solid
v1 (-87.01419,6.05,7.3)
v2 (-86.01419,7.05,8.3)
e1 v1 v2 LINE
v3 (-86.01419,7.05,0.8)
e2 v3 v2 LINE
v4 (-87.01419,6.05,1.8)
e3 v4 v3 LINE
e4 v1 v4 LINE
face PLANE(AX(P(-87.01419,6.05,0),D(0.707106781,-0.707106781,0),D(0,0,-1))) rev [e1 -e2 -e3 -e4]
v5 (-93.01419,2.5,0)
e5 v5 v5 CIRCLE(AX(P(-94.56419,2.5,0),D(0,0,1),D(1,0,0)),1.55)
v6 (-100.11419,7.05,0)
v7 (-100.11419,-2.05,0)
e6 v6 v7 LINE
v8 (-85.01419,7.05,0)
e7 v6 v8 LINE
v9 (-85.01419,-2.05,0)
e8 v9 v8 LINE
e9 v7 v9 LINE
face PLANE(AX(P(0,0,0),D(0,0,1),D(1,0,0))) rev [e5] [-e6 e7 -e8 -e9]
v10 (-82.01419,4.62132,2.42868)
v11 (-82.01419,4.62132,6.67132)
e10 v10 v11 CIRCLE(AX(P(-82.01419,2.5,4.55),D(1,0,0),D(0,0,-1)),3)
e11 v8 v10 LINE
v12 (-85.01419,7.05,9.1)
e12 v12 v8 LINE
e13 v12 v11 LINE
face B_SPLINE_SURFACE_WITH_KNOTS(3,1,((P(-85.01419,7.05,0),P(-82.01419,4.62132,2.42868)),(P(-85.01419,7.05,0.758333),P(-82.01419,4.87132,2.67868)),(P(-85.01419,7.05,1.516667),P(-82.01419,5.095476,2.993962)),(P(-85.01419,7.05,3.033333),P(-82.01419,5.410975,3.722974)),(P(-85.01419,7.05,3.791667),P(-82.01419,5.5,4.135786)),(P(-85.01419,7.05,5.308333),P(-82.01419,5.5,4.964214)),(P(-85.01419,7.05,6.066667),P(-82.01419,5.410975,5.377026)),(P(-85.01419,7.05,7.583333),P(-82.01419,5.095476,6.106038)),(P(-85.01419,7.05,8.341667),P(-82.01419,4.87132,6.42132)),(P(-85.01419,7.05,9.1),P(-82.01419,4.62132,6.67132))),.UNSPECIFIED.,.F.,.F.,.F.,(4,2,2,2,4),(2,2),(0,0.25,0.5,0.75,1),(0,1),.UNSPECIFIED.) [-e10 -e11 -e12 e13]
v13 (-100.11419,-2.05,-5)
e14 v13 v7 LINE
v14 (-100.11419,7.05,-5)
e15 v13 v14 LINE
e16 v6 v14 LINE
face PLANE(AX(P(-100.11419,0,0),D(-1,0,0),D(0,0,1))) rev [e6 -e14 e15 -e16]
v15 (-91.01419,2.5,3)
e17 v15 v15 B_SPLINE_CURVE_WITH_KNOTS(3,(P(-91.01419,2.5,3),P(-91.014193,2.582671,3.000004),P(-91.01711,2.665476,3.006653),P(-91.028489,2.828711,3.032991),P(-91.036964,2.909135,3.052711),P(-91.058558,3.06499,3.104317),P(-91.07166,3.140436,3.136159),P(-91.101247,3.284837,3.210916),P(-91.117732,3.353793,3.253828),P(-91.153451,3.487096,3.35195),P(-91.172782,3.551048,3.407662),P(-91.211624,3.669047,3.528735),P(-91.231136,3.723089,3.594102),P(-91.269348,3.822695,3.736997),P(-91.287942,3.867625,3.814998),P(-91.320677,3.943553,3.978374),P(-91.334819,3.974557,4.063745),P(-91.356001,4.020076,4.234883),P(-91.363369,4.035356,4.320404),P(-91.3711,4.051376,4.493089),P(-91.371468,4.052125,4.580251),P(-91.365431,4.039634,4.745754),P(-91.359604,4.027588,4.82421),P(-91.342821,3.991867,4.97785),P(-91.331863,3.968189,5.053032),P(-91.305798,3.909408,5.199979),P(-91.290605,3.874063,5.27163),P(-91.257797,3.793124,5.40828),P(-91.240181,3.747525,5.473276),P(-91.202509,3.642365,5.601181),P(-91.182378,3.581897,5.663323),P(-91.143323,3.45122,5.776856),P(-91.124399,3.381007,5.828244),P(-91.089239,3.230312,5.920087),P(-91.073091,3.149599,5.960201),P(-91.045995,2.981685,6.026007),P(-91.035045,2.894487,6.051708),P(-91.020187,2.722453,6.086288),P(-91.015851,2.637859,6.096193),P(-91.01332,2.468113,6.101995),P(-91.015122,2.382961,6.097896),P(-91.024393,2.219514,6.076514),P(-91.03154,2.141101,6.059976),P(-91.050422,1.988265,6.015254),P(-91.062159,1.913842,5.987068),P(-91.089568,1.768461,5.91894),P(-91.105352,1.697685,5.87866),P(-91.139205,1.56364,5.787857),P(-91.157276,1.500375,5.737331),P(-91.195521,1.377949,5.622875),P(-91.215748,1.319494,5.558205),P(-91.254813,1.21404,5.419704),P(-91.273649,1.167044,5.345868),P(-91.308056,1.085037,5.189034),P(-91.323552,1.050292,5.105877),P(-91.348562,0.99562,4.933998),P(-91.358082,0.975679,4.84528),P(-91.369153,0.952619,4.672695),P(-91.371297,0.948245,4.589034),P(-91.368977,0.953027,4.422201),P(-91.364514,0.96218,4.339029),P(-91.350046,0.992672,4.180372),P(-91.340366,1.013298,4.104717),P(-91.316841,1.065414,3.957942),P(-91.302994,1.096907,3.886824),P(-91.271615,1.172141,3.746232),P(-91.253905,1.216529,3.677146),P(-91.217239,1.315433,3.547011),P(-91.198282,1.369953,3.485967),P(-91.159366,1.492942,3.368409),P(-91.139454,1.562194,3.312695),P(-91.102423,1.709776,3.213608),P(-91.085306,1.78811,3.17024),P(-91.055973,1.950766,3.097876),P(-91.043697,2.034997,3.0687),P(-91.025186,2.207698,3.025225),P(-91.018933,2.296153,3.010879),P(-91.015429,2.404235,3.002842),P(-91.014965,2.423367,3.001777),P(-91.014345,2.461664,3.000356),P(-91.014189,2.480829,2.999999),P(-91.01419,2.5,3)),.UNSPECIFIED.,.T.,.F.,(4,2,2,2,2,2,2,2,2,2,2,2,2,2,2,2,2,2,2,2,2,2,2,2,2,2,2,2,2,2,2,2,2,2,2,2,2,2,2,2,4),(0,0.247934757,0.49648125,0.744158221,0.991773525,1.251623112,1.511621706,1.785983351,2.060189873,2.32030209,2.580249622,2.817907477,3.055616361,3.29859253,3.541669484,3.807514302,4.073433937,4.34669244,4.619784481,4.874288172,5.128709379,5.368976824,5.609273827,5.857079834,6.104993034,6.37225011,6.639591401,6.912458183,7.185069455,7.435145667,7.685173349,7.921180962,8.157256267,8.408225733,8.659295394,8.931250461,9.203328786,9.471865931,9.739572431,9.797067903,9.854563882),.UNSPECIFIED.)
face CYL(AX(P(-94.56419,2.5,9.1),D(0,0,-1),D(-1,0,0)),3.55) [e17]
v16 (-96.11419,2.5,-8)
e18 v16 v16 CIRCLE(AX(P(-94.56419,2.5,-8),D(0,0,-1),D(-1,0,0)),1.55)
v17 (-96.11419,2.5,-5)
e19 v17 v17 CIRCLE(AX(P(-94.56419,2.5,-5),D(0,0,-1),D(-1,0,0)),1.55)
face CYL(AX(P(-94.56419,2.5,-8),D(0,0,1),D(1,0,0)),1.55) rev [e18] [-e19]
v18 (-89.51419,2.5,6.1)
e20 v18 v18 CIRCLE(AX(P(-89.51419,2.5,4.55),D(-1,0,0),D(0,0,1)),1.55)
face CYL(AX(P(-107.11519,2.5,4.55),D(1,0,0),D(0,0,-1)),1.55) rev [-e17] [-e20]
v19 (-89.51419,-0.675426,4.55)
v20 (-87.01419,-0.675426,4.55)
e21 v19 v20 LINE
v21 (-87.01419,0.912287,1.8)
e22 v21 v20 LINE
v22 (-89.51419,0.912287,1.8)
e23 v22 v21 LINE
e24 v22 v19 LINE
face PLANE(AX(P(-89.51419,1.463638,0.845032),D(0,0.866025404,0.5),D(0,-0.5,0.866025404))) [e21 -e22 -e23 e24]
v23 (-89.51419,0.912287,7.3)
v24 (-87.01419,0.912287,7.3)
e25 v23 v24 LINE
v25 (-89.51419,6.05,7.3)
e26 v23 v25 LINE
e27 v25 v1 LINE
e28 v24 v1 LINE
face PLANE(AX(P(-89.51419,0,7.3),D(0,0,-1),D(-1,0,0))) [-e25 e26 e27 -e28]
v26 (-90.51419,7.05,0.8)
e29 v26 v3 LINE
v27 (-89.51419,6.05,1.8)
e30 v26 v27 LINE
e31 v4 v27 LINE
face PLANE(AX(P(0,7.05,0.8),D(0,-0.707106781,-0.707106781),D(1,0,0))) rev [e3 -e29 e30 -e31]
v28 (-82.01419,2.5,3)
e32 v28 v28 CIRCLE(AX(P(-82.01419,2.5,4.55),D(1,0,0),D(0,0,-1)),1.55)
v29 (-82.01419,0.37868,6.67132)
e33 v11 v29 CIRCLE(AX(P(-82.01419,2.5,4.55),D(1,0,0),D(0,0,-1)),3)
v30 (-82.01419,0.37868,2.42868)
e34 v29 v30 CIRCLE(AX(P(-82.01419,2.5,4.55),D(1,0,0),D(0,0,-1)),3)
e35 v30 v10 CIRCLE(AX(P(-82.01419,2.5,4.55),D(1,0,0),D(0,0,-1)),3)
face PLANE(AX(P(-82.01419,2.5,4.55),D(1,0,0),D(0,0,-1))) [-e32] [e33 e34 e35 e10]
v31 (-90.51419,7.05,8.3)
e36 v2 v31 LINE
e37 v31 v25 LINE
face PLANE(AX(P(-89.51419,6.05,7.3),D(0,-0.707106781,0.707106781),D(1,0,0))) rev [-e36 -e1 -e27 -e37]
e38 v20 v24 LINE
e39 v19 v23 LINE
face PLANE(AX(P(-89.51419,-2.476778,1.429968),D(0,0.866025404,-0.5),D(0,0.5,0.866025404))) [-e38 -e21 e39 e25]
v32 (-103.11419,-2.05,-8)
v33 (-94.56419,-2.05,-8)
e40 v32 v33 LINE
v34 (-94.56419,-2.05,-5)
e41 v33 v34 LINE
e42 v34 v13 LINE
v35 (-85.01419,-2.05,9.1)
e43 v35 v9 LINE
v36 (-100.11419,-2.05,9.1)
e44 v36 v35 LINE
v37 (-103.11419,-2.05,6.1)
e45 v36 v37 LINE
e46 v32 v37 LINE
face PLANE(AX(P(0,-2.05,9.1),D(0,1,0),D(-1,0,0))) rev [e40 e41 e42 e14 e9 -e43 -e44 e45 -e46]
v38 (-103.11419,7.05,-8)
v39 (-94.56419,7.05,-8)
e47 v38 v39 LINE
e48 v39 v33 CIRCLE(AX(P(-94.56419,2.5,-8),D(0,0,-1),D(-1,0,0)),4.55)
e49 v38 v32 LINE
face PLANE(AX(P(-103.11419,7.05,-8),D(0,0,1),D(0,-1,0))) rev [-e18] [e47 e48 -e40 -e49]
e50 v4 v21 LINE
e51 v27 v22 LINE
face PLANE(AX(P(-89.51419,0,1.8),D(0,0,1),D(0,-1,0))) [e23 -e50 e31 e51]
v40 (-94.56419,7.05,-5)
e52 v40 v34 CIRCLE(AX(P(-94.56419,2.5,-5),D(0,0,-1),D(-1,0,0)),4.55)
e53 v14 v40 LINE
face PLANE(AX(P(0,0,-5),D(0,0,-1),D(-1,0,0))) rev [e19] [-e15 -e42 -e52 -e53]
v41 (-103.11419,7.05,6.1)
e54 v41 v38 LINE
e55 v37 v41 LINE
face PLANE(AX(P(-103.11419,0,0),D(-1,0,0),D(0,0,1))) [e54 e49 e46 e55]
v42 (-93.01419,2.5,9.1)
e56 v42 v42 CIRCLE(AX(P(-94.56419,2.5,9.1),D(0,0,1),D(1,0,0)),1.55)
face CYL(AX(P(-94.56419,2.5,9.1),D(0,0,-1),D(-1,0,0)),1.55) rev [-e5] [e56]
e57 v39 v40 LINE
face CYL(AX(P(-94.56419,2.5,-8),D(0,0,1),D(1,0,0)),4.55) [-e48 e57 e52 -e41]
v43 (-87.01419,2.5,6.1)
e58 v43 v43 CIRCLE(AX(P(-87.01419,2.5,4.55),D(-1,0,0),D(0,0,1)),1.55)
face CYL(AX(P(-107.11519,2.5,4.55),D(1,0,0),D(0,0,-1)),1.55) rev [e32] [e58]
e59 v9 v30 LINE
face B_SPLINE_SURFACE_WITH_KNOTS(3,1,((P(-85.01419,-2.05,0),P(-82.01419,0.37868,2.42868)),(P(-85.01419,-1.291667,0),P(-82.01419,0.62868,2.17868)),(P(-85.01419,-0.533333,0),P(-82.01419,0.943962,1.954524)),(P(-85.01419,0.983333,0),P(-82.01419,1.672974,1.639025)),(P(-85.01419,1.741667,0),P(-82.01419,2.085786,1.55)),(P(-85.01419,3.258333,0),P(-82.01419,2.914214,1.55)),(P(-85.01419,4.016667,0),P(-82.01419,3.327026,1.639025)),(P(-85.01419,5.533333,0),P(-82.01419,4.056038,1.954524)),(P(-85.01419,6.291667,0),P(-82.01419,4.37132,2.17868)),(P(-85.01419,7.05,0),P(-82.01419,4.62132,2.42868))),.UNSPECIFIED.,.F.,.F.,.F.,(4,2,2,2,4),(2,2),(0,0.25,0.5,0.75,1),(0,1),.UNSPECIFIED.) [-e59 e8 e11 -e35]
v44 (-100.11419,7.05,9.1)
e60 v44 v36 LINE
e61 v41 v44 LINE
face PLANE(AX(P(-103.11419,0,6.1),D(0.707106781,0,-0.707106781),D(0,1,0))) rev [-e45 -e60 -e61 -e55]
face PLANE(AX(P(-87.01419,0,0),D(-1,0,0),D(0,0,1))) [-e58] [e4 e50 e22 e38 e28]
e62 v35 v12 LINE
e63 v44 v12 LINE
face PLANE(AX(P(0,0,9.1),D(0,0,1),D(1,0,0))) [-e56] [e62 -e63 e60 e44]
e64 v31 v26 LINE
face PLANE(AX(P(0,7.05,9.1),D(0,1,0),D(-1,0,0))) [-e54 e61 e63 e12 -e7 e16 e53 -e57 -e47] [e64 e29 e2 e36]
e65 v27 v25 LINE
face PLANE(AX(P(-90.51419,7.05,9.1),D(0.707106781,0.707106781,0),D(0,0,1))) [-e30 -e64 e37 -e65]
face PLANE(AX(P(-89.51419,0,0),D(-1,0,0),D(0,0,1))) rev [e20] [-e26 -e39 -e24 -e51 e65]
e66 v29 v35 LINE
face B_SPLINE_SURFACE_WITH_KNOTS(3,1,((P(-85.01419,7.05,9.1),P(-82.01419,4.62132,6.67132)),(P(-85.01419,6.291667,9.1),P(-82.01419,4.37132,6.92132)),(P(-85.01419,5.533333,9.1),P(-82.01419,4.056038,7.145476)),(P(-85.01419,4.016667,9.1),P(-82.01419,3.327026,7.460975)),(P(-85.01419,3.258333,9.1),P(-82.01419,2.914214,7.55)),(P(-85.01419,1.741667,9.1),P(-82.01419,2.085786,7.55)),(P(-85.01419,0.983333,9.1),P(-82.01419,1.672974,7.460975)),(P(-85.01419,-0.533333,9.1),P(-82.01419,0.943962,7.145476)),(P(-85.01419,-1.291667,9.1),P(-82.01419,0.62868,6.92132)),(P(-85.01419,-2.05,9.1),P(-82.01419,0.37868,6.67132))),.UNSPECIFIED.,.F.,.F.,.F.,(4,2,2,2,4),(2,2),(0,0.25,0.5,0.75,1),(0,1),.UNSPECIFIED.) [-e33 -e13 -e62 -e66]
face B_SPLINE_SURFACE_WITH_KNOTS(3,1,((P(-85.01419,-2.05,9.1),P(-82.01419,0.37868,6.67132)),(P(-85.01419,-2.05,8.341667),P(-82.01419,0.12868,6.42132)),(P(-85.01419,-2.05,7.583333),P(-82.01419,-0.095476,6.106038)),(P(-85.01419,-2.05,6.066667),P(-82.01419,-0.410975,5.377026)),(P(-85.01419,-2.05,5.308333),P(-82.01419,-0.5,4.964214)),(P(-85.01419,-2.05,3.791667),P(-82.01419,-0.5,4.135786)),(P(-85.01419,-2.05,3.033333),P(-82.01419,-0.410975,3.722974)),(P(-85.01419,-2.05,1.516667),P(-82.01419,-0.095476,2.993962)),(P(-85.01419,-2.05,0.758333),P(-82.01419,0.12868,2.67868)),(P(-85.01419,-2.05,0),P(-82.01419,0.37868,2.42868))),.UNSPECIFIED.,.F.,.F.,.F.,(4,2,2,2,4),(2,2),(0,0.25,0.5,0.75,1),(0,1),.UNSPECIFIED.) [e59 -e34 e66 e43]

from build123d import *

# Parameters (mm, degrees)
SKETCH1_R               = 4.55
SKETCH1_R_2             = 1.55
BOSS_EXTRUDE1_DEPTH     = 9.1
SKETCH2_R               = 1.55
BOSS_EXTRUDE2_DEPTH     = 3
SKETCH3_W               = 17.1
SKETCH3_H               = 9.1
BOSS_EXTRUDE3_DEPTH     = 3
CUT_EXTRUDE1_REACH      = 26.036
CUT_EXTRUDE1_END_RADIUS = 3.55
SKETCH4_R               = 1.55
SKETCH5_R               = 1.55
CUT_EXTRUDE2_DEPTH      = 2.5
CHAMFER1_SIZE           = 1
CHAMFER2_SIZE           = 3


with BuildPart() as part:
    # Sketch1 → Boss-Extrude1 (new body)
    # profile 1 of 3: a face of its own
    with BuildSketch(Plane.XY):
        with Locations((-94.564189657, 2.5)):
            Circle(SKETCH1_R)
        with Locations((-94.564189657, 2.5)):
            Circle(SKETCH1_R_2, mode=Mode.SUBTRACT)
    # profile 2 of 3: a face of its own
    with BuildSketch(Plane.XY):
        with BuildLine():
            ThreePointArc((-94.564189657, -2.05), (-99.114189657, 2.5), (-94.564189657, 7.05))
            Line((-94.564189657, 7.05), (-100.114189657, 7.05))
            Line((-100.114189657, 7.05), (-100.114189657, -2.05))
            Line((-100.114189657, -2.05), (-94.564189657, -2.05))
        make_face()
    # profile 3 of 3: a face of its own
    with BuildSketch(Plane.XY):
        with BuildLine():
            Line((-85.014189657, 7.05), (-94.564189657, 7.05))
            ThreePointArc((-94.564189657, 7.05), (-91.346853802, 5.717335854), (-90.014189657, 2.5))
            ThreePointArc((-90.014189657, 2.5), (-91.346853802, -0.717335854), (-94.564189657, -2.05))
            Line((-94.564189657, -2.05), (-85.014189657, -2.05))
            Line((-85.014189657, -2.05), (-85.014189657, 7.05))
        make_face()
    extrude(amount=BOSS_EXTRUDE1_DEPTH)



with BuildPart() as body_2:
    # Sketch2 → Boss-Extrude2 (new body)
    # profile 1 of 2: a face of its own
    with BuildSketch(Plane(origin=(0, 0, -5), x_dir=(-1, 0, 0), z_dir=(0, 0, -1))):
        with BuildLine():
            ThreePointArc((99.114189657, 2.5), (97.781525511, 5.717335854), (94.564189657, 7.05))
            ThreePointArc((94.564189657, 7.05), (90.014189657, 2.5), (94.564189657, -2.05))
            ThreePointArc((94.564189657, -2.05), (97.781525511, -0.717335854), (99.114189657, 2.5))
        make_face()
        with Locations(Location((94.564189657, 2.5, 0), (0, 0, 180))):
            Circle(SKETCH2_R, mode=Mode.SUBTRACT)
    # profile 2 of 2: a face of its own
    with BuildSketch(Plane(origin=(0, 0, -5), x_dir=(-1, 0, 0), z_dir=(0, 0, -1))):
        with BuildLine():
            Line((100.114189657, -2.05), (100.114189657, 7.05))
            Line((100.114189657, 7.05), (94.564189657, 7.05))
            ThreePointArc((94.564189657, 7.05), (97.781525511, 5.717335854), (99.114189657, 2.5))
            ThreePointArc((99.114189657, 2.5), (97.781525511, -0.717335854), (94.564189657, -2.05))
            Line((94.564189657, -2.05), (100.114189657, -2.05))
        make_face()
    extrude(amount=BOSS_EXTRUDE2_DEPTH)


with BuildPart() as part_1:
    add(part.part)

    add(body_2.part)  # Boss-Extrude3 merges body 2
    # Sketch3 → Boss-Extrude3 (add)
    with BuildSketch(Plane.ZY.offset(100.114189657)):
        with Locations((0.55, 2.5)):
            Rectangle(SKETCH3_W, SKETCH3_H)
    extrude(amount=BOSS_EXTRUDE3_DEPTH)

    # Loft1: read off the stored shape, not the designer's step
    # Loft1: loft between two sections, ruled curve by curve
    loft1_from = [
        Edge.make_bspline([(-85.014189657, -2.05, 9.1), (-85.014189657, -2.05, 8.341666667), (-85.014189657, -2.05, 7.583333333), (-85.014189657, -2.05, 6.066666667), (-85.014189657, -2.05, 5.308333333), (-85.014189657, -2.05, 3.791666667), (-85.014189657, -2.05, 3.033333333), (-85.014189657, -2.05, 1.516666667), (-85.014189657, -2.05, 0.758333333), (-85.014189657, -2.05, 0)], [0, 0, 0, 0, 0.25, 0.25, 0.5, 0.5, 0.75, 0.75, 1, 1, 1, 1], 3),
        Edge.make_bspline([(-85.014189657, -2.05, 0), (-85.014189657, -1.291666667, 0), (-85.014189657, -0.533333333, 0), (-85.014189657, 0.983333333, 0), (-85.014189657, 1.741666667, 0), (-85.014189657, 3.258333333, 0), (-85.014189657, 4.016666667, 0), (-85.014189657, 5.533333333, 0), (-85.014189657, 6.291666667, 0), (-85.014189657, 7.05, 0)], [0, 0, 0, 0, 0.25, 0.25, 0.5, 0.5, 0.75, 0.75, 1, 1, 1, 1], 3),
        Edge.make_bspline([(-85.014189657, 7.05, 9.1), (-85.014189657, 6.291666667, 9.1), (-85.014189657, 5.533333333, 9.1), (-85.014189657, 4.016666667, 9.1), (-85.014189657, 3.258333333, 9.1), (-85.014189657, 1.741666667, 9.1), (-85.014189657, 0.983333333, 9.1), (-85.014189657, -0.533333333, 9.1), (-85.014189657, -1.291666667, 9.1), (-85.014189657, -2.05, 9.1)], [0, 0, 0, 0, 0.25, 0.25, 0.5, 0.5, 0.75, 0.75, 1, 1, 1, 1], 3),
        Edge.make_bspline([(-85.014189657, 7.05, 0), (-85.014189657, 7.05, 0.758333333), (-85.014189657, 7.05, 1.516666667), (-85.014189657, 7.05, 3.033333333), (-85.014189657, 7.05, 3.791666667), (-85.014189657, 7.05, 5.308333333), (-85.014189657, 7.05, 6.066666667), (-85.014189657, 7.05, 7.583333333), (-85.014189657, 7.05, 8.341666667), (-85.014189657, 7.05, 9.1)], [0, 0, 0, 0, 0.25, 0.25, 0.5, 0.5, 0.75, 0.75, 1, 1, 1, 1], 3),
    ]
    loft1_to = [
        Edge.make_bspline([(-82.014189657, 0.378679656, 6.671320344), (-82.014189657, 0.128679656, 6.421320344), (-82.014189657, -0.095475789, 6.106038327), (-82.014189657, -0.410975479, 5.377025758), (-82.014189657, -0.5, 4.964213562), (-82.014189657, -0.5, 4.135786438), (-82.014189657, -0.410975479, 3.722974242), (-82.014189657, -0.095475789, 2.993961673), (-82.014189657, 0.128679656, 2.678679656), (-82.014189657, 0.378679656, 2.428679656)], [0, 0, 0, 0, 0.25, 0.25, 0.5, 0.5, 0.75, 0.75, 1, 1, 1, 1], 3),
        Edge.make_bspline([(-82.014189657, 0.378679656, 2.428679656), (-82.014189657, 0.628679656, 2.178679656), (-82.014189657, 0.943961673, 1.954524211), (-82.014189657, 1.672974242, 1.639024521), (-82.014189657, 2.085786438, 1.55), (-82.014189657, 2.914213562, 1.55), (-82.014189657, 3.327025758, 1.639024521), (-82.014189657, 4.056038327, 1.954524211), (-82.014189657, 4.371320344, 2.178679656), (-82.014189657, 4.621320344, 2.428679656)], [0, 0, 0, 0, 0.25, 0.25, 0.5, 0.5, 0.75, 0.75, 1, 1, 1, 1], 3),
        Edge.make_bspline([(-82.014189657, 4.621320344, 6.671320344), (-82.014189657, 4.371320344, 6.921320344), (-82.014189657, 4.056038327, 7.145475789), (-82.014189657, 3.327025758, 7.460975479), (-82.014189657, 2.914213562, 7.55), (-82.014189657, 2.085786438, 7.55), (-82.014189657, 1.672974242, 7.460975479), (-82.014189657, 0.943961673, 7.145475789), (-82.014189657, 0.628679656, 6.921320344), (-82.014189657, 0.378679656, 6.671320344)], [0, 0, 0, 0, 0.25, 0.25, 0.5, 0.5, 0.75, 0.75, 1, 1, 1, 1], 3),
        Edge.make_bspline([(-82.014189657, 4.621320344, 2.428679656), (-82.014189657, 4.871320344, 2.678679656), (-82.014189657, 5.095475789, 2.993961673), (-82.014189657, 5.410975479, 3.722974242), (-82.014189657, 5.5, 4.135786438), (-82.014189657, 5.5, 4.964213562), (-82.014189657, 5.410975479, 5.377025758), (-82.014189657, 5.095475789, 6.106038327), (-82.014189657, 4.871320344, 6.421320344), (-82.014189657, 4.621320344, 6.671320344)], [0, 0, 0, 0, 0.25, 0.25, 0.5, 0.5, 0.75, 0.75, 1, 1, 1, 1], 3),
    ]
    loft1 = Solid(Shell([*[Face.make_surface_from_curves(loft1_from[k], loft1_to[k]) for k in range(4)], Face(Wire(loft1_from)), Face(Wire(loft1_to))]))
    add(loft1)

    # Cut-Extrude1: up to this cylinder (the profile starts outside it)
    cut_extrude1_end = Plane(origin=(-94.564189657, 2.5, 4.55), z_dir=(0, 0, -1)) * Cylinder(CUT_EXTRUDE1_END_RADIUS, 60.172, mode=Mode.PRIVATE)
    # Sketch4 → Cut-Extrude1 (cut, up to the surface)
    with BuildSketch(Plane(origin=(-82.014189657, 0, 0), x_dir=(0, 0, -1), z_dir=(1, 0, 0)), mode=Mode.PRIVATE) as cut_extrude1_sk1:
        with Locations((-4.55, 2.5)):
            Circle(SKETCH4_R)
    cut_extrude1_tool1 = extrude(cut_extrude1_sk1.sketch, amount=-CUT_EXTRUDE1_REACH, mode=Mode.PRIVATE) - cut_extrude1_end
    add(cut_extrude1_tool1.solids().sort_by_distance((-82.01419, 2.5, 4.55))[0], mode=Mode.SUBTRACT)

    # Sketch5 → Cut-Extrude2 (cut)
    # profile 1 of 2: a face of its own
    with BuildSketch(Plane.ZY.offset(87.014189657)):
        Polygon((4.55, 5.675426481), (7.3, 4.08771324), (7.3, 7.05), (1.8, 7.05), (1.8, 4.08771324), align=None)
    # profile 2 of 2: a face of its own
    with BuildSketch(Plane.ZY.offset(87.014189657)):
        Polygon((7.3, 0.91228676), (7.3, 4.08771324), (4.55, 5.675426481), (1.8, 4.08771324), (1.8, 0.91228676), (4.55, -0.675426481), align=None)
        with Locations(Location((4.55, 2.5, 0), (0, 0, 180))):
            Circle(SKETCH5_R, mode=Mode.SUBTRACT)
    extrude(amount=CUT_EXTRUDE2_DEPTH, mode=Mode.SUBTRACT)

    # Chamfer1
    chamfer1_edges = [part_1.edges().sort_by_distance(p)[0] for p in [
        (-87.014189657, 7.05, 4.55),
        (-88.264189657, 7.05, 7.3),
        (-88.264189657, 7.05, 1.8),
        (-89.514189657, 7.05, 4.55),
    ]]
    chamfer(chamfer1_edges, length=CHAMFER1_SIZE)

    # Chamfer2
    chamfer2_edges = [part_1.edges().sort_by_distance(p)[0] for p in [
        (-103.114189657, 2.5, 9.1),
    ]]
    chamfer(chamfer2_edges, length=CHAMFER2_SIZE)


solid = part_1.part
